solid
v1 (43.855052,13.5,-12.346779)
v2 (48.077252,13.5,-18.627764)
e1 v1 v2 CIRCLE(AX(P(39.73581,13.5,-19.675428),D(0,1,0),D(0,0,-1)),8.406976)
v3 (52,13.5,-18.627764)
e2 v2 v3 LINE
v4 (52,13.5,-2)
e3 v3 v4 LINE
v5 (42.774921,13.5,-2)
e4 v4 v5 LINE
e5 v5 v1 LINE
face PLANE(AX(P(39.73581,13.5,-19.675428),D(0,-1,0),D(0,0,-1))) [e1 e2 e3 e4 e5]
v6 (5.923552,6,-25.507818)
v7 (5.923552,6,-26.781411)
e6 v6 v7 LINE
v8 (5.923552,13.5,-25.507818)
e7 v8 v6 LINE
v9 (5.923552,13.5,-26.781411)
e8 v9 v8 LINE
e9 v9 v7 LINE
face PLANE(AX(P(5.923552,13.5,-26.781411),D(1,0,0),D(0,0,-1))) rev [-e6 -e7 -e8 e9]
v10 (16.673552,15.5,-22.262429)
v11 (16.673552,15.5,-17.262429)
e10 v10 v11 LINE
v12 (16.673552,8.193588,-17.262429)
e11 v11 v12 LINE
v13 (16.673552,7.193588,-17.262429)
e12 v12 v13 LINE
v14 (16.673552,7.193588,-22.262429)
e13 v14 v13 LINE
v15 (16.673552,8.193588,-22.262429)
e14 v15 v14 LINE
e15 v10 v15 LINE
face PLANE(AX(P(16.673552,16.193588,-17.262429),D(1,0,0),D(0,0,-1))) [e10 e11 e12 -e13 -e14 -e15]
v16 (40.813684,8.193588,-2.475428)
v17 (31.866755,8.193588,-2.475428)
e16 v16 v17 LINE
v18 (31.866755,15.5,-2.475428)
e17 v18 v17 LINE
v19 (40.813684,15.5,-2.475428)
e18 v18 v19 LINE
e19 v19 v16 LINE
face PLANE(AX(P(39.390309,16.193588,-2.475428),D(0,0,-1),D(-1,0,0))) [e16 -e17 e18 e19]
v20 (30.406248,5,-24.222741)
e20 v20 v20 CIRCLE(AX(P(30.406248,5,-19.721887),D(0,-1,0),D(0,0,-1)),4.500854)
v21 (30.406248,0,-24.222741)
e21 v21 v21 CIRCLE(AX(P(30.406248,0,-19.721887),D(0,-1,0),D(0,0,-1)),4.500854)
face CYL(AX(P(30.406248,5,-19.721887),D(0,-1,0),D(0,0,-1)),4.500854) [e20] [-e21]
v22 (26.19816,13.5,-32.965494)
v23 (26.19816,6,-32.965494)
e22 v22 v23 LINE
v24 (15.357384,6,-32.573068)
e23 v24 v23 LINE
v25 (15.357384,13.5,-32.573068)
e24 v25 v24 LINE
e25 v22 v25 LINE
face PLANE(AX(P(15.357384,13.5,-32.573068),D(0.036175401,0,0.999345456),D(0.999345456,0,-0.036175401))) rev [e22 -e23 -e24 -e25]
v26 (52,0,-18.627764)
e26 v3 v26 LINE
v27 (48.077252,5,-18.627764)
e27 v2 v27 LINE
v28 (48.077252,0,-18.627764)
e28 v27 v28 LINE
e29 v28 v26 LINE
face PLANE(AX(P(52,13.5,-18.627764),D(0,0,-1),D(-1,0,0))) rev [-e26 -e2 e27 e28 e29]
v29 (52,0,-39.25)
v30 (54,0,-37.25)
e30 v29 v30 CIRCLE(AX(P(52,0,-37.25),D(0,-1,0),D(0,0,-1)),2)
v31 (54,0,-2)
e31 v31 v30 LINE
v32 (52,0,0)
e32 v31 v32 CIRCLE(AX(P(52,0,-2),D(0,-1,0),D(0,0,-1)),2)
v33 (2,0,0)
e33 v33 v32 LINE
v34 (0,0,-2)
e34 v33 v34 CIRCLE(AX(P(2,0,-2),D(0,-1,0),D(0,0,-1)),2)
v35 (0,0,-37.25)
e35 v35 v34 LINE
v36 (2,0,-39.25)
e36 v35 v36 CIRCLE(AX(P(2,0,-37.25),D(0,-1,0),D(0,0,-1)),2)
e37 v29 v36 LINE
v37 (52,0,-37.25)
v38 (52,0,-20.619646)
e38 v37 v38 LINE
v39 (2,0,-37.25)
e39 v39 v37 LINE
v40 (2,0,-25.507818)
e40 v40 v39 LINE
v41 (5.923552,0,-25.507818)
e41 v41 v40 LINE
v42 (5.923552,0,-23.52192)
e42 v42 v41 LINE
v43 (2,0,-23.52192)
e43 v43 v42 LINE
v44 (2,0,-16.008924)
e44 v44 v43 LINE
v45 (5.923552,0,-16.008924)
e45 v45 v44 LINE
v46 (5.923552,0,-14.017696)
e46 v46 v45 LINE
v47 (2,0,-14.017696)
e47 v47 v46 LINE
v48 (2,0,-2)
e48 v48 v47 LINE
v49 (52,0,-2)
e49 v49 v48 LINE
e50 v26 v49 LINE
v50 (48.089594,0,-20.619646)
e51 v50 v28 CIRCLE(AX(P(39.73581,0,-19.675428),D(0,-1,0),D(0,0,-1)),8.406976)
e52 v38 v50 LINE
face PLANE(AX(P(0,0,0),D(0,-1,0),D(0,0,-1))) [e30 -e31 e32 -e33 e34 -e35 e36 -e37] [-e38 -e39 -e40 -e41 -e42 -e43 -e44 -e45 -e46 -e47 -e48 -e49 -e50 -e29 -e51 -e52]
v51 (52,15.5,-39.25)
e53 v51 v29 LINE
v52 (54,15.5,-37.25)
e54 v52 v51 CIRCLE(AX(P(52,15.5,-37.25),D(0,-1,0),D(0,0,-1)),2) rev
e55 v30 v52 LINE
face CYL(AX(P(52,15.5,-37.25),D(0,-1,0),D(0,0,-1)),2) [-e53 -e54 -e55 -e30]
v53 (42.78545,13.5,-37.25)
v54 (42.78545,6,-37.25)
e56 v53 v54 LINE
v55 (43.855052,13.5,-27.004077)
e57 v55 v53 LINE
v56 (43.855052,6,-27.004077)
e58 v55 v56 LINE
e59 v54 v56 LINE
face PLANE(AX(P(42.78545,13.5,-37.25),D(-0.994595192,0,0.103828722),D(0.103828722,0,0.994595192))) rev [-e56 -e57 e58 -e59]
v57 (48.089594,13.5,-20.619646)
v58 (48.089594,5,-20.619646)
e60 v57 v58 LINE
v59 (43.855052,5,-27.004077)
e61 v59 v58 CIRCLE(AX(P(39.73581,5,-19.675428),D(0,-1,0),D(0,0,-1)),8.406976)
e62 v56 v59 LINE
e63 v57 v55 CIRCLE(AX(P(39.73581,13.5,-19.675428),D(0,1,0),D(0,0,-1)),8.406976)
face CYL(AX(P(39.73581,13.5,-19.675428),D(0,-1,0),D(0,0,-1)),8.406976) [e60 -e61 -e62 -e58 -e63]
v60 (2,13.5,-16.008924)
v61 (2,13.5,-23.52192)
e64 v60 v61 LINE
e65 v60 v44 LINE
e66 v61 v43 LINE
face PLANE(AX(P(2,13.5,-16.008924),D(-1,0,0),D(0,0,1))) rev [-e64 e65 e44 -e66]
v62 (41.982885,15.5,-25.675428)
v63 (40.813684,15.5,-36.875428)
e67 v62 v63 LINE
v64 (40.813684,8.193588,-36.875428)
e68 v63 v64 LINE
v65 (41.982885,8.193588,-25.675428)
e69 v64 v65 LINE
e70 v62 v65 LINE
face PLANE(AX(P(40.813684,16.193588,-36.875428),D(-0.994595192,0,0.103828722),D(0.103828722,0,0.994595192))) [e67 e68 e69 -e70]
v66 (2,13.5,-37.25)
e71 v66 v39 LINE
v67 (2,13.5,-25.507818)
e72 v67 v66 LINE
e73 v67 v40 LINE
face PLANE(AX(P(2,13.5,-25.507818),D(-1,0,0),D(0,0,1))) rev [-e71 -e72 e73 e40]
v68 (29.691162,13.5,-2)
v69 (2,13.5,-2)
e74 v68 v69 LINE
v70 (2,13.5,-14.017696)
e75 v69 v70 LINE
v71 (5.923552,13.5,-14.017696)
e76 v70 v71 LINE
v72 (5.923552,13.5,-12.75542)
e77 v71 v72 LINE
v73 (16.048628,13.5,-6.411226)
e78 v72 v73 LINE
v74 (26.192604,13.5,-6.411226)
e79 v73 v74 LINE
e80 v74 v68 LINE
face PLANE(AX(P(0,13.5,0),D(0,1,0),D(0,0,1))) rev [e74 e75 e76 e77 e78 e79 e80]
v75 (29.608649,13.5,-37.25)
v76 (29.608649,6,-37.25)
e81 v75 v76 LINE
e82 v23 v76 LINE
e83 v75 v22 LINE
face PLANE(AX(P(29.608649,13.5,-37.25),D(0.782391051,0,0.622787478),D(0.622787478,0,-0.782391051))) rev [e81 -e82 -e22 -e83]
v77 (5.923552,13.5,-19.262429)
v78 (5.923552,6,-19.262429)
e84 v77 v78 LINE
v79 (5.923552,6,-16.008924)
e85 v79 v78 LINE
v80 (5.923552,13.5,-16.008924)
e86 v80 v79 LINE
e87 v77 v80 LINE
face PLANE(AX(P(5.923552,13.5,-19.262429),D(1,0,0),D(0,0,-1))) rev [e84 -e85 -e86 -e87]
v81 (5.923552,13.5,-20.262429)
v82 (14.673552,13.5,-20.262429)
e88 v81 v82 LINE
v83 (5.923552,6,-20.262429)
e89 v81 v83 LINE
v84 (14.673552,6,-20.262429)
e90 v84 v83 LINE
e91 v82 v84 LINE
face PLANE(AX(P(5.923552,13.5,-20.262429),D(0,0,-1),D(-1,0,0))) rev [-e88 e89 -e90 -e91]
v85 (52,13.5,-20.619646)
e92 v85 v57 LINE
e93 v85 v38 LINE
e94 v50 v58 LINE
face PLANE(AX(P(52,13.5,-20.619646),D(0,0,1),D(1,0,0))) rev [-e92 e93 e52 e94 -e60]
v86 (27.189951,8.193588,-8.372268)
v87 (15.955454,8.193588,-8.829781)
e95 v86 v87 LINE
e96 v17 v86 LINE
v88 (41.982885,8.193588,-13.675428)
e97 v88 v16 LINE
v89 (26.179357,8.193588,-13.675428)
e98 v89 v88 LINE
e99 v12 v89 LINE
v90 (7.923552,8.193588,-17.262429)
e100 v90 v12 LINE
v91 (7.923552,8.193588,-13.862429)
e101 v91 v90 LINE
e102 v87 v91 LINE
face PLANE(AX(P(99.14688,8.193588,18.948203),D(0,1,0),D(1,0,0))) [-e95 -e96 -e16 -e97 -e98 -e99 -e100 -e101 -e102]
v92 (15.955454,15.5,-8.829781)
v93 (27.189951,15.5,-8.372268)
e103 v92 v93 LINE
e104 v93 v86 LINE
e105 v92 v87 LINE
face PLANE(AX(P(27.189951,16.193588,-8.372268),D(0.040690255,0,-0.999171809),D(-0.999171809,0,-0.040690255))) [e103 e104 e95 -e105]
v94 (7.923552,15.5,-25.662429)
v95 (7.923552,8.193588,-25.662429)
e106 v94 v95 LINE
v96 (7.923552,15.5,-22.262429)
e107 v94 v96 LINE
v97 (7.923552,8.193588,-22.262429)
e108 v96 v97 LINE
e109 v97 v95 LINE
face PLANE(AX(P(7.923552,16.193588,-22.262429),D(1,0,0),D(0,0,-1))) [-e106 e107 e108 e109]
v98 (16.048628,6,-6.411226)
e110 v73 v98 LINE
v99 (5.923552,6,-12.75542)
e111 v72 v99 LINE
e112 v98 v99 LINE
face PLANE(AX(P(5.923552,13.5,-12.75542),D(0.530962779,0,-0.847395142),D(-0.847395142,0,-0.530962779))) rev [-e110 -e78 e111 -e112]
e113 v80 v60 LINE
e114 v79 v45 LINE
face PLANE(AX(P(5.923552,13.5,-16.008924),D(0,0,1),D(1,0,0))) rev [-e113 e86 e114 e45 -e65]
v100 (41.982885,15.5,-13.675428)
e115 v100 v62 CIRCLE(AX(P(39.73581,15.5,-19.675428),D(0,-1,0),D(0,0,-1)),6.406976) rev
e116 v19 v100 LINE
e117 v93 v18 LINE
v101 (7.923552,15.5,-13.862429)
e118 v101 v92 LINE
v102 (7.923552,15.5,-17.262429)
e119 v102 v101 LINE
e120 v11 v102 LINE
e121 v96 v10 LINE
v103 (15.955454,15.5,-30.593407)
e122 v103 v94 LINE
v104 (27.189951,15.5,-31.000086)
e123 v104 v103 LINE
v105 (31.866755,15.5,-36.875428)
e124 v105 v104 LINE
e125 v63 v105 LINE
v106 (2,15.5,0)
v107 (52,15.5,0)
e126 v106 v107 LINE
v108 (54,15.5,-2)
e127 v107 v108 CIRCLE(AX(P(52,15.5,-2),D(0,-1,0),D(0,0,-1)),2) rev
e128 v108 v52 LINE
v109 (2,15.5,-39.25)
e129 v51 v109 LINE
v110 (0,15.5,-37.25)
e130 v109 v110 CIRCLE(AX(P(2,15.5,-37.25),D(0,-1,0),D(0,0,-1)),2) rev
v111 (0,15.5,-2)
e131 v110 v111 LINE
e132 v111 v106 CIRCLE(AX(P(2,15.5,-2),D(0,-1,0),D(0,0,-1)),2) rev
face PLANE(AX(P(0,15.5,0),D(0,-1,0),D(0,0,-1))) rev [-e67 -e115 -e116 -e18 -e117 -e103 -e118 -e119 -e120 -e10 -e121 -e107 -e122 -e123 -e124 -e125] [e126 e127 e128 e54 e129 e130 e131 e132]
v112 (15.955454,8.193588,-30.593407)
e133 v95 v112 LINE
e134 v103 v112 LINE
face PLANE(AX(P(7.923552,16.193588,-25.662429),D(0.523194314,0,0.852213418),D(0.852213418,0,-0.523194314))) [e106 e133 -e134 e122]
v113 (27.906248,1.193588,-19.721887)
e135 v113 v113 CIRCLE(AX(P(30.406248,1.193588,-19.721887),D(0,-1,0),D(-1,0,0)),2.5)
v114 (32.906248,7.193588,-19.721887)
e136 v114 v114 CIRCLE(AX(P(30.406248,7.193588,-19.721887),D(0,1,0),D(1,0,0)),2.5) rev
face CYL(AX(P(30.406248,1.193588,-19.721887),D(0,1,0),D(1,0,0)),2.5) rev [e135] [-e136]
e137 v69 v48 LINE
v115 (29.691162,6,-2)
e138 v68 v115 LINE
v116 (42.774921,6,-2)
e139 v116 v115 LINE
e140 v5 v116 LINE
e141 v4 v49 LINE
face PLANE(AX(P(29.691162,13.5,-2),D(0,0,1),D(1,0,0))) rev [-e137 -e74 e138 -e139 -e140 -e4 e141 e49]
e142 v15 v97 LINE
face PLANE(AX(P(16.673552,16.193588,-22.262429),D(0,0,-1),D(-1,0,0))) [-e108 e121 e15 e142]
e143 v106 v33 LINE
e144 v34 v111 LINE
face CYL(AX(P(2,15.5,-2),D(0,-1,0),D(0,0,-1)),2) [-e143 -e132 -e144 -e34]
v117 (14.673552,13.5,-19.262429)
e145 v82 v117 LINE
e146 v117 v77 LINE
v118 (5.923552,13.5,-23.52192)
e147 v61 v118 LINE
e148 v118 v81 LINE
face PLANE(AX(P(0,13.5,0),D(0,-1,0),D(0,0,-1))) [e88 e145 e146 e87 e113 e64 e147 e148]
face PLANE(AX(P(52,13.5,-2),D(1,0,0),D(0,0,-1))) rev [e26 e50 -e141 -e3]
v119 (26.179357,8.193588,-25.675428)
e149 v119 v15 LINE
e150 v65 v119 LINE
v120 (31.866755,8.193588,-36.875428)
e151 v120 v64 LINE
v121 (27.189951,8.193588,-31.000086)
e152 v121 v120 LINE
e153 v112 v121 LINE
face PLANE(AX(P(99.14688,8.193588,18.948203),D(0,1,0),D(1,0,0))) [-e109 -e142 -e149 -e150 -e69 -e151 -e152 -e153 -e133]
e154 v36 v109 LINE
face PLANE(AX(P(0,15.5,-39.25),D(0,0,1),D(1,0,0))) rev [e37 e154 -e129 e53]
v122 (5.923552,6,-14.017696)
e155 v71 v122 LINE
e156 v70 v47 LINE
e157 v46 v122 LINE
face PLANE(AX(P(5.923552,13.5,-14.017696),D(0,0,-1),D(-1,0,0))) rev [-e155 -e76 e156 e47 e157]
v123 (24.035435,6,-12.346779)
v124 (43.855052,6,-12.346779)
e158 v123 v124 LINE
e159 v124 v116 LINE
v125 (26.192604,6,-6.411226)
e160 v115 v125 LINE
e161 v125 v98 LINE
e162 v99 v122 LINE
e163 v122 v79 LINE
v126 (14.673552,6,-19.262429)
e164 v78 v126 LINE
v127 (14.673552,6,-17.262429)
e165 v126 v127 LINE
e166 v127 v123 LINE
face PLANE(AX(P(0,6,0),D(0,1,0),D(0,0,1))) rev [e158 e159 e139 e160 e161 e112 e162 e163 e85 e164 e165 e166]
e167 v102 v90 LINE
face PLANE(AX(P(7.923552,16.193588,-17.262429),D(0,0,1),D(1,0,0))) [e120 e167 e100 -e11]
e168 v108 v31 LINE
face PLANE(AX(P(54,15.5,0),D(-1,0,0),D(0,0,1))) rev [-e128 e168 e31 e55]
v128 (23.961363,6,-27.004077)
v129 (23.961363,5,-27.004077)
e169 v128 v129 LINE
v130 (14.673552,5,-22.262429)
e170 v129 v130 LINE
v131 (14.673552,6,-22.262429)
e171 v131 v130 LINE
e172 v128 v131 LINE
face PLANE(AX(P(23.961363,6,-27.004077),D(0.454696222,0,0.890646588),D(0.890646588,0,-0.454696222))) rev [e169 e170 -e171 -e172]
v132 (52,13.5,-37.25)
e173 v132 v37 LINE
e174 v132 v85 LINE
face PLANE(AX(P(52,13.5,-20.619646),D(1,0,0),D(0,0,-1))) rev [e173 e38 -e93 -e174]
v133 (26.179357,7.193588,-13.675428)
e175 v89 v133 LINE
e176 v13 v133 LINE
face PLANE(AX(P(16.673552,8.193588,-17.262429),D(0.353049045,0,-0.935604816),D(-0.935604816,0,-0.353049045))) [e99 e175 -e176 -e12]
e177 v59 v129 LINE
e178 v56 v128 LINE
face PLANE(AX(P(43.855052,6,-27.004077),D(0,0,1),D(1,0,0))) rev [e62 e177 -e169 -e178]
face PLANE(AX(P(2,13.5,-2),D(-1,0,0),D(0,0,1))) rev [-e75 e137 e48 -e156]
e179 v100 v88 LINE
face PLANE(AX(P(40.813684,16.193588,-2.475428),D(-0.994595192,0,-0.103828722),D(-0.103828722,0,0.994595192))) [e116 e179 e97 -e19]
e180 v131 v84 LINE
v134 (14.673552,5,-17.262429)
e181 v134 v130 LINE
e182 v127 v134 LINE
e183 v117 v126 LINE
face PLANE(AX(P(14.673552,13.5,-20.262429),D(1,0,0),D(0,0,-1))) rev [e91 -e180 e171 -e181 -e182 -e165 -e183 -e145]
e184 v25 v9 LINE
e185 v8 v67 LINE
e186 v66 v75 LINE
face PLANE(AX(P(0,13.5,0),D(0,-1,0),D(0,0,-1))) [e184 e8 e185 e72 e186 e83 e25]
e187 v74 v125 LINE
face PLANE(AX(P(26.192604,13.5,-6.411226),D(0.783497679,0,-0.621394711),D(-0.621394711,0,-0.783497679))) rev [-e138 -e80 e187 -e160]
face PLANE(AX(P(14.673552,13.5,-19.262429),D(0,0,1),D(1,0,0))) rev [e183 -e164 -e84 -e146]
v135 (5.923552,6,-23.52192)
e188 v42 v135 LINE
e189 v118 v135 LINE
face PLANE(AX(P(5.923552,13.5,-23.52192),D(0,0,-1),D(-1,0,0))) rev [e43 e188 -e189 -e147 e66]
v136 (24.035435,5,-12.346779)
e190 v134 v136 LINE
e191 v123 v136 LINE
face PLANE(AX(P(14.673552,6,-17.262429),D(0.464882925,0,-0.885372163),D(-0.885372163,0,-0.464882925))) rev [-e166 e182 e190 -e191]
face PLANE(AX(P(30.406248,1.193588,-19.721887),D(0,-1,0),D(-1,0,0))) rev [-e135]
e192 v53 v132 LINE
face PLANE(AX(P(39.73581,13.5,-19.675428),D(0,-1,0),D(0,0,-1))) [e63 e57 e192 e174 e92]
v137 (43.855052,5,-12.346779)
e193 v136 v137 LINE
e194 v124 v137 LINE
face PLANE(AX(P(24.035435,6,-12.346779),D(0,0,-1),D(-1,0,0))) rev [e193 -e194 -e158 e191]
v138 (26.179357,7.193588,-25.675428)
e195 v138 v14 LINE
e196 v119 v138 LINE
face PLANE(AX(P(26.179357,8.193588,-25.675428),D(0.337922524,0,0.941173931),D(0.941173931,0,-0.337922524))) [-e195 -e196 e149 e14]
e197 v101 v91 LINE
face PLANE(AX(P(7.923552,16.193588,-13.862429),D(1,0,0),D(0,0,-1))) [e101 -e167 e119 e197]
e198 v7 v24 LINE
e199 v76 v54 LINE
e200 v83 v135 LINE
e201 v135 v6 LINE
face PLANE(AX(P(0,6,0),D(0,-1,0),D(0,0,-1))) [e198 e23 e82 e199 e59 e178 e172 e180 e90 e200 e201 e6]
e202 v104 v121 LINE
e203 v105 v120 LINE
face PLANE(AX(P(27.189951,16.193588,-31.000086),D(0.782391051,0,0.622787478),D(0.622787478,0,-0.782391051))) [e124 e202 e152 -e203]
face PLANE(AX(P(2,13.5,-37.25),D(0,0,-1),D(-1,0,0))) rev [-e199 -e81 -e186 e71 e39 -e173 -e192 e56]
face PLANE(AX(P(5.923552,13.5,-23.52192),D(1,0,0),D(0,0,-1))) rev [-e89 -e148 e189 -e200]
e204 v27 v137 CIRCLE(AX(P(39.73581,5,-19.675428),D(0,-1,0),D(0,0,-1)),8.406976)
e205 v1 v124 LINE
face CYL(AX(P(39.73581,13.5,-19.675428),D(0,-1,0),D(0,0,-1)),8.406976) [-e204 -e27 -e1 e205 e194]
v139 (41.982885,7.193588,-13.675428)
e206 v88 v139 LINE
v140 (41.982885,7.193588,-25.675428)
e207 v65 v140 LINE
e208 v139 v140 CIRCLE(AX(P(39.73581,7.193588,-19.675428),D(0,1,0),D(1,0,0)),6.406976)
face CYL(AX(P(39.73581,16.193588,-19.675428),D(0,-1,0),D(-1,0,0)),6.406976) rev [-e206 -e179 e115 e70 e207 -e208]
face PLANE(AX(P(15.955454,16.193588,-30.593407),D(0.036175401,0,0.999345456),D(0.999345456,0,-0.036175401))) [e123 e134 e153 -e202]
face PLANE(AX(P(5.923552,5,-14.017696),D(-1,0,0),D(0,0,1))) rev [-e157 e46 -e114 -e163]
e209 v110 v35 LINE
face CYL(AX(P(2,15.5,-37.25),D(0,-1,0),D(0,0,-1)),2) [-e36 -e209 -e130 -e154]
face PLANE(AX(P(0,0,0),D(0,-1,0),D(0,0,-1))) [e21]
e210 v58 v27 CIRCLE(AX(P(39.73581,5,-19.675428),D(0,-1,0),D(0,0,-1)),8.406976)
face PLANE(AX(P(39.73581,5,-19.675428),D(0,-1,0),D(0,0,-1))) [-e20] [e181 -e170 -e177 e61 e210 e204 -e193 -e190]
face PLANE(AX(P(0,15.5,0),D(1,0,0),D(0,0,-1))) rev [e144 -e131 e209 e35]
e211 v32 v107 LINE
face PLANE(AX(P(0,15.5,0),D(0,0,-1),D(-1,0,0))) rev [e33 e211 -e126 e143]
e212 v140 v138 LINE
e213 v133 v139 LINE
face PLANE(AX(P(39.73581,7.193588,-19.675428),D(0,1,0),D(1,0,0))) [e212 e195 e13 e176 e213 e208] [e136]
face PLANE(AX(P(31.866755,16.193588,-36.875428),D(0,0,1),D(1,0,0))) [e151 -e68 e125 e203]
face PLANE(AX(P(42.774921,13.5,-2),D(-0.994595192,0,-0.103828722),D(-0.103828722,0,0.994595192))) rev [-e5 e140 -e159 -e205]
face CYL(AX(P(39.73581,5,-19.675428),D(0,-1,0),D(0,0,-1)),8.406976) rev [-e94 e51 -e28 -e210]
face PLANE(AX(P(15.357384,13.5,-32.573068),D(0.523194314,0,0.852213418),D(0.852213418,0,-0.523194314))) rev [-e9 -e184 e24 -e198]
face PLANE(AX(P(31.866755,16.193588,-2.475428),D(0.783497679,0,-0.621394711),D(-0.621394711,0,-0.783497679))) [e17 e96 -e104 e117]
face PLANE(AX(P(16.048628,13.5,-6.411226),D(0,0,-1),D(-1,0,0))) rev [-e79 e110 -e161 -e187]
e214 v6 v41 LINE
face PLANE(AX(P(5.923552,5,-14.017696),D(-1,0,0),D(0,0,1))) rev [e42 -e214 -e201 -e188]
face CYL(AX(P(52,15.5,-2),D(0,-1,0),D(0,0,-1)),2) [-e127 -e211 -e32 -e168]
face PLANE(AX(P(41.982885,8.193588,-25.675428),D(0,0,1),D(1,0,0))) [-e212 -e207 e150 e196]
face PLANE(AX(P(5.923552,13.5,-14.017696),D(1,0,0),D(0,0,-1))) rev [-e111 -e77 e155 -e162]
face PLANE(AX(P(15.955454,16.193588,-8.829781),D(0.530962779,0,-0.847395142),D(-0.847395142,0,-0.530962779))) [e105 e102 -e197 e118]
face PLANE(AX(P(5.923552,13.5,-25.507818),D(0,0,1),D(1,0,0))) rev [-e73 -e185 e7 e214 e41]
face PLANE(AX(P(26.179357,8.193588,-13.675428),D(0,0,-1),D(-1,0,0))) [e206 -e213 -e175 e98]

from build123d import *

# Parameters (mm, degrees)
SKETCH1_W              = 54
SKETCH1_H              = 39.25
BOSS_EXTRUDE1_DEPTH    = 15.5
FILLET1_R              = 2
FILLET2_R              = 2
M3_A_START             = -2.329776532
M3_A_BLANK_DEPTH       = 8
M3_A_START_2           = -3.329776532
M3_A_BLANK_2_DEPTH     = 1
M3_A_START_3           = -9.329776532
M3_A_BLANK_3_OUTLINE_R = 2.5
M3_A_BLANK_3_DEPTH     = 6
BODY_MOVE_COPY6_ANGLE  = 90
CUT_EXTRUDE1_DEPTH     = 13.5
SKETCH4_R              = 4.500854338
CUT_EXTRUDE3_DEPTH     = 5
CUT_EXTRUDE4_DEPTH     = 1


with BuildPart() as part:
    # Sketch1 → Boss-Extrude1 (new body)
    with BuildSketch(Plane(origin=(0, 0, 0), x_dir=(1, 0, 0), z_dir=(0, 1, 0))):
        with Locations((27, 19.625)):
            Rectangle(SKETCH1_W, SKETCH1_H)
    extrude(amount=BOSS_EXTRUDE1_DEPTH)

    # Fillet1
    fillet1_edges = [part.edges().sort_by_distance(p)[0] for p in [
        (0, 7.75, 0),
    ]]
    fillet(fillet1_edges, radius=FILLET1_R)

    # Fillet2
    fillet2_edges = [part.edges().sort_by_distance(p)[0] for p in [
        (0, 7.75, -39.25),
        (54, 7.75, -39.25),
        (54, 7.75, 0),
    ]]
    fillet(fillet2_edges, radius=FILLET2_R)


with BuildPart() as body_2:
    # M3-A Blank: read off the stored shape, not the designer's step
    # M3-A Blank outline → M3-A Blank (new body)
    with BuildSketch(Plane(origin=(0, 0, 0), x_dir=(1, 0, 0), z_dir=(0, 1, 0)).offset(M3_A_START)):
        with BuildLine():
            Line((-21.79493826, 68.00205199), (-26.79493826, 68.00205199))
            Line((-26.79493826, 68.00205199), (-26.79493826, 76.75205199))
            Line((-26.79493826, 76.75205199), (-30.19493826, 76.75205199))
            Line((-30.19493826, 76.75205199), (-35.227586031, 68.720149487))
            Line((-35.227586031, 68.720149487), (-35.685099465, 57.485652948))
            Line((-35.685099465, 57.485652948), (-41.581939277, 52.808848959))
            Line((-41.581939277, 52.808848959), (-41.581939277, 43.861919588))
            Line((-41.581939277, 43.861919588), (-30.381939277, 42.692718591))
            ThreePointArc((-30.381939277, 42.692718591), (-24.381939277, 38.532817401), (-18.381939277, 42.692718591))
            Line((-18.381939277, 42.692718591), (-7.181939277, 43.861919588))
            Line((-7.181939277, 43.861919588), (-7.181939277, 52.808848959))
            Line((-7.181939277, 52.808848959), (-13.057281533, 57.485652948))
            Line((-13.057281533, 57.485652948), (-13.463960141, 68.720149487))
            Line((-13.463960141, 68.720149487), (-18.39493826, 76.75205199))
            Line((-18.39493826, 76.75205199), (-21.79493826, 76.75205199))
            Line((-21.79493826, 76.75205199), (-21.79493826, 68.00205199))
        make_face()
    extrude(amount=M3_A_BLANK_DEPTH)

    # M3-A Blank 2 outline → M3-A Blank 2 (add)
    with BuildSketch(Plane(origin=(0, 0, 0), x_dir=(1, 0, 0), z_dir=(0, 1, 0)).offset(M3_A_START_2)):
        with BuildLine():
            Line((-30.381939277, 58.496246856), (-30.381939277, 42.692718591))
            ThreePointArc((-30.381939277, 42.692718591), (-24.381939277, 38.532817401), (-18.381939277, 42.692718591))
            Line((-18.381939277, 42.692718591), (-18.381939277, 58.496246856))
            Line((-18.381939277, 58.496246856), (-21.79493826, 68.00205199))
            Line((-21.79493826, 68.00205199), (-26.79493826, 68.00205199))
            Line((-26.79493826, 68.00205199), (-30.381939277, 58.496246856))
        make_face()
    extrude(amount=M3_A_BLANK_2_DEPTH)

    # M3-A Blank 3 outline → M3-A Blank 3 (add)
    with BuildSketch(Plane(origin=(0, 0, 0), x_dir=(1, 0, 0), z_dir=(0, 1, 0)).offset(M3_A_START_3)):
        with Locations((-24.335480832, 54.269355582)):
            Circle(M3_A_BLANK_3_OUTLINE_R)
    extrude(amount=M3_A_BLANK_3_DEPTH)


with BuildPart() as body_2_1:
    # Body-Move/Copy4: moved
    add(body_2.part.moved(Location((42.5, 8.919688157, 37.96700657))))


with BuildPart() as body_2_2:
    # Body-Move/Copy5: moved
    add(body_2_1.part.moved(Location((8.915108254, 0, 0))))


with BuildPart() as body_2_3:
    # Body-Move/Copy6: moved
    add(body_2_2.part.rotate(Axis((27.033168977, 0, -19.675428126), (0, 1, 0)), BODY_MOVE_COPY6_ANGLE))


with BuildPart() as body_2_4:
    # Body-Move/Copy7: moved
    add(body_2_3.part.moved(Location((0, 1.103676274, 0))))


with BuildPart() as body_2_5:
    # Body-Move/Copy8: moved
    add(body_2_4.part.moved(Location((0, 0.5, 0))))


with BuildPart() as part_1:
    add(part.part)

    # Intersect1: read off the stored shape, not the designer's step
    # Intersect1: cut body 2
    add(body_2_5.part, mode=Mode.SUBTRACT)

    # Sketch3 → Cut-Extrude1 (cut)
    with BuildSketch(Plane(origin=(0, 0, 0), x_dir=(-1, 0, 0), z_dir=(0, -1, 0))):
        Polygon((-5.923551682, 12.755419679), (-16.048628272, 6.41122612), (-26.192603819, 6.41122612), (-29.691162465, 2), (-2, 2), (-2, 14.017695962), (-5.923551682, 14.017695962), align=None)
        Polygon((-2, 37.25), (-29.60864948, 37.25), (-26.198159594, 32.965493874), (-15.357384062, 32.57306761), (-5.923551682, 26.781411023), (-5.923551682, 25.507817982), (-2, 25.507817982), align=None)
        Polygon((-5.923551682, 20.262429143), (-14.673551682, 20.262429143), (-14.673551682, 19.262429143), (-5.923551682, 19.262429143), (-5.923551682, 16.008924411), (-2, 16.008924411), (-2, 23.521920083), (-5.923551682, 23.521920083), align=None)
        with BuildLine():
            Line((-42.774921098, 2), (-52, 2))
            Line((-52, 2), (-52, 18.627764364))
            Line((-52, 18.627764364), (-48.077251764, 18.627764364))
            ThreePointArc((-48.077251764, 18.627764364), (-46.712904885, 14.985289801), (-43.85505184, 12.346778986))
            Line((-43.85505184, 12.346778986), (-42.774921098, 2))
        make_face()
        with BuildLine():
            Line((-52, 37.25), (-42.78544978, 37.25))
            Line((-42.78544978, 37.25), (-43.85505184, 27.004077266))
            ThreePointArc((-43.85505184, 27.004077266), (-46.741831066, 24.322246322), (-48.089593706, 20.619646239))
            Line((-48.089593706, 20.619646239), (-52, 20.619646239))
            Line((-52, 20.619646239), (-52, 37.25))
        make_face()
    extrude(amount=-CUT_EXTRUDE1_DEPTH, mode=Mode.SUBTRACT)

    # Sketch4 → Cut-Extrude3 (cut)
    with BuildSketch(Plane.XZ):
        with BuildLine():
            Line((5.923551682, -14.017695962), (5.923551682, -12.755419679))
            Line((5.923551682, -12.755419679), (16.048628272, -6.41122612))
            Line((16.048628272, -6.41122612), (26.192603819, -6.41122612))
            Line((26.192603819, -6.41122612), (29.691162465, -2))
            Line((29.691162465, -2), (42.774921098, -2))
            Line((42.774921098, -2), (43.85505184, -12.346778986))
            ThreePointArc((43.85505184, -12.346778986), (48.142786272, -19.675428126), (43.85505184, -27.004077266))
            Line((43.85505184, -27.004077266), (42.78544978, -37.25))
            Line((42.78544978, -37.25), (29.60864948, -37.25))
            Line((29.60864948, -37.25), (26.198159594, -32.965493874))
            Line((26.198159594, -32.965493874), (15.357384062, -32.57306761))
            Line((15.357384062, -32.57306761), (5.923551682, -26.781411023))
            Line((5.923551682, -26.781411023), (5.923551682, -25.507817982))
            Line((5.923551682, -25.507817982), (5.923551682, -23.521920083))
            Line((5.923551682, -23.521920083), (5.923551682, -20.262429143))
            Line((5.923551682, -20.262429143), (5.923551682, -19.262429143))
            Line((5.923551682, -19.262429143), (5.923551682, -16.008924411))
            Line((5.923551682, -16.008924411), (5.923551682, -14.017695962))
        make_face()
        with Locations(Location((30.40624809, -19.721886571, 0), (0, 0, 270))):
            Circle(SKETCH4_R, mode=Mode.SUBTRACT)
    extrude(amount=-CUT_EXTRUDE3_DEPTH, mode=Mode.SUBTRACT)

    # Sketch5 → Cut-Extrude4 (cut)
    with BuildSketch(Plane.XZ.offset(-5)):
        Polygon((43.85505184, -12.346778986), (42.774921098, -2), (29.691162465, -2), (26.192603819, -6.41122612), (16.048628272, -6.41122612), (5.923551682, -12.755419679), (5.923551682, -19.262429143), (14.673551682, -19.262429143), (14.673551682, -17.262429143), (24.035435238, -12.346778986), align=None)
        Polygon((14.673551682, -20.262429143), (5.923551682, -20.262429143), (5.923551682, -26.781411023), (15.357384062, -32.57306761), (26.198159594, -32.965493874), (29.60864948, -37.25), (42.78544978, -37.25), (43.85505184, -27.004077266), (23.961363008, -27.004077266), (14.673551682, -22.262429143), align=None)
    extrude(amount=-CUT_EXTRUDE4_DEPTH, mode=Mode.SUBTRACT)


solid = part_1.part
